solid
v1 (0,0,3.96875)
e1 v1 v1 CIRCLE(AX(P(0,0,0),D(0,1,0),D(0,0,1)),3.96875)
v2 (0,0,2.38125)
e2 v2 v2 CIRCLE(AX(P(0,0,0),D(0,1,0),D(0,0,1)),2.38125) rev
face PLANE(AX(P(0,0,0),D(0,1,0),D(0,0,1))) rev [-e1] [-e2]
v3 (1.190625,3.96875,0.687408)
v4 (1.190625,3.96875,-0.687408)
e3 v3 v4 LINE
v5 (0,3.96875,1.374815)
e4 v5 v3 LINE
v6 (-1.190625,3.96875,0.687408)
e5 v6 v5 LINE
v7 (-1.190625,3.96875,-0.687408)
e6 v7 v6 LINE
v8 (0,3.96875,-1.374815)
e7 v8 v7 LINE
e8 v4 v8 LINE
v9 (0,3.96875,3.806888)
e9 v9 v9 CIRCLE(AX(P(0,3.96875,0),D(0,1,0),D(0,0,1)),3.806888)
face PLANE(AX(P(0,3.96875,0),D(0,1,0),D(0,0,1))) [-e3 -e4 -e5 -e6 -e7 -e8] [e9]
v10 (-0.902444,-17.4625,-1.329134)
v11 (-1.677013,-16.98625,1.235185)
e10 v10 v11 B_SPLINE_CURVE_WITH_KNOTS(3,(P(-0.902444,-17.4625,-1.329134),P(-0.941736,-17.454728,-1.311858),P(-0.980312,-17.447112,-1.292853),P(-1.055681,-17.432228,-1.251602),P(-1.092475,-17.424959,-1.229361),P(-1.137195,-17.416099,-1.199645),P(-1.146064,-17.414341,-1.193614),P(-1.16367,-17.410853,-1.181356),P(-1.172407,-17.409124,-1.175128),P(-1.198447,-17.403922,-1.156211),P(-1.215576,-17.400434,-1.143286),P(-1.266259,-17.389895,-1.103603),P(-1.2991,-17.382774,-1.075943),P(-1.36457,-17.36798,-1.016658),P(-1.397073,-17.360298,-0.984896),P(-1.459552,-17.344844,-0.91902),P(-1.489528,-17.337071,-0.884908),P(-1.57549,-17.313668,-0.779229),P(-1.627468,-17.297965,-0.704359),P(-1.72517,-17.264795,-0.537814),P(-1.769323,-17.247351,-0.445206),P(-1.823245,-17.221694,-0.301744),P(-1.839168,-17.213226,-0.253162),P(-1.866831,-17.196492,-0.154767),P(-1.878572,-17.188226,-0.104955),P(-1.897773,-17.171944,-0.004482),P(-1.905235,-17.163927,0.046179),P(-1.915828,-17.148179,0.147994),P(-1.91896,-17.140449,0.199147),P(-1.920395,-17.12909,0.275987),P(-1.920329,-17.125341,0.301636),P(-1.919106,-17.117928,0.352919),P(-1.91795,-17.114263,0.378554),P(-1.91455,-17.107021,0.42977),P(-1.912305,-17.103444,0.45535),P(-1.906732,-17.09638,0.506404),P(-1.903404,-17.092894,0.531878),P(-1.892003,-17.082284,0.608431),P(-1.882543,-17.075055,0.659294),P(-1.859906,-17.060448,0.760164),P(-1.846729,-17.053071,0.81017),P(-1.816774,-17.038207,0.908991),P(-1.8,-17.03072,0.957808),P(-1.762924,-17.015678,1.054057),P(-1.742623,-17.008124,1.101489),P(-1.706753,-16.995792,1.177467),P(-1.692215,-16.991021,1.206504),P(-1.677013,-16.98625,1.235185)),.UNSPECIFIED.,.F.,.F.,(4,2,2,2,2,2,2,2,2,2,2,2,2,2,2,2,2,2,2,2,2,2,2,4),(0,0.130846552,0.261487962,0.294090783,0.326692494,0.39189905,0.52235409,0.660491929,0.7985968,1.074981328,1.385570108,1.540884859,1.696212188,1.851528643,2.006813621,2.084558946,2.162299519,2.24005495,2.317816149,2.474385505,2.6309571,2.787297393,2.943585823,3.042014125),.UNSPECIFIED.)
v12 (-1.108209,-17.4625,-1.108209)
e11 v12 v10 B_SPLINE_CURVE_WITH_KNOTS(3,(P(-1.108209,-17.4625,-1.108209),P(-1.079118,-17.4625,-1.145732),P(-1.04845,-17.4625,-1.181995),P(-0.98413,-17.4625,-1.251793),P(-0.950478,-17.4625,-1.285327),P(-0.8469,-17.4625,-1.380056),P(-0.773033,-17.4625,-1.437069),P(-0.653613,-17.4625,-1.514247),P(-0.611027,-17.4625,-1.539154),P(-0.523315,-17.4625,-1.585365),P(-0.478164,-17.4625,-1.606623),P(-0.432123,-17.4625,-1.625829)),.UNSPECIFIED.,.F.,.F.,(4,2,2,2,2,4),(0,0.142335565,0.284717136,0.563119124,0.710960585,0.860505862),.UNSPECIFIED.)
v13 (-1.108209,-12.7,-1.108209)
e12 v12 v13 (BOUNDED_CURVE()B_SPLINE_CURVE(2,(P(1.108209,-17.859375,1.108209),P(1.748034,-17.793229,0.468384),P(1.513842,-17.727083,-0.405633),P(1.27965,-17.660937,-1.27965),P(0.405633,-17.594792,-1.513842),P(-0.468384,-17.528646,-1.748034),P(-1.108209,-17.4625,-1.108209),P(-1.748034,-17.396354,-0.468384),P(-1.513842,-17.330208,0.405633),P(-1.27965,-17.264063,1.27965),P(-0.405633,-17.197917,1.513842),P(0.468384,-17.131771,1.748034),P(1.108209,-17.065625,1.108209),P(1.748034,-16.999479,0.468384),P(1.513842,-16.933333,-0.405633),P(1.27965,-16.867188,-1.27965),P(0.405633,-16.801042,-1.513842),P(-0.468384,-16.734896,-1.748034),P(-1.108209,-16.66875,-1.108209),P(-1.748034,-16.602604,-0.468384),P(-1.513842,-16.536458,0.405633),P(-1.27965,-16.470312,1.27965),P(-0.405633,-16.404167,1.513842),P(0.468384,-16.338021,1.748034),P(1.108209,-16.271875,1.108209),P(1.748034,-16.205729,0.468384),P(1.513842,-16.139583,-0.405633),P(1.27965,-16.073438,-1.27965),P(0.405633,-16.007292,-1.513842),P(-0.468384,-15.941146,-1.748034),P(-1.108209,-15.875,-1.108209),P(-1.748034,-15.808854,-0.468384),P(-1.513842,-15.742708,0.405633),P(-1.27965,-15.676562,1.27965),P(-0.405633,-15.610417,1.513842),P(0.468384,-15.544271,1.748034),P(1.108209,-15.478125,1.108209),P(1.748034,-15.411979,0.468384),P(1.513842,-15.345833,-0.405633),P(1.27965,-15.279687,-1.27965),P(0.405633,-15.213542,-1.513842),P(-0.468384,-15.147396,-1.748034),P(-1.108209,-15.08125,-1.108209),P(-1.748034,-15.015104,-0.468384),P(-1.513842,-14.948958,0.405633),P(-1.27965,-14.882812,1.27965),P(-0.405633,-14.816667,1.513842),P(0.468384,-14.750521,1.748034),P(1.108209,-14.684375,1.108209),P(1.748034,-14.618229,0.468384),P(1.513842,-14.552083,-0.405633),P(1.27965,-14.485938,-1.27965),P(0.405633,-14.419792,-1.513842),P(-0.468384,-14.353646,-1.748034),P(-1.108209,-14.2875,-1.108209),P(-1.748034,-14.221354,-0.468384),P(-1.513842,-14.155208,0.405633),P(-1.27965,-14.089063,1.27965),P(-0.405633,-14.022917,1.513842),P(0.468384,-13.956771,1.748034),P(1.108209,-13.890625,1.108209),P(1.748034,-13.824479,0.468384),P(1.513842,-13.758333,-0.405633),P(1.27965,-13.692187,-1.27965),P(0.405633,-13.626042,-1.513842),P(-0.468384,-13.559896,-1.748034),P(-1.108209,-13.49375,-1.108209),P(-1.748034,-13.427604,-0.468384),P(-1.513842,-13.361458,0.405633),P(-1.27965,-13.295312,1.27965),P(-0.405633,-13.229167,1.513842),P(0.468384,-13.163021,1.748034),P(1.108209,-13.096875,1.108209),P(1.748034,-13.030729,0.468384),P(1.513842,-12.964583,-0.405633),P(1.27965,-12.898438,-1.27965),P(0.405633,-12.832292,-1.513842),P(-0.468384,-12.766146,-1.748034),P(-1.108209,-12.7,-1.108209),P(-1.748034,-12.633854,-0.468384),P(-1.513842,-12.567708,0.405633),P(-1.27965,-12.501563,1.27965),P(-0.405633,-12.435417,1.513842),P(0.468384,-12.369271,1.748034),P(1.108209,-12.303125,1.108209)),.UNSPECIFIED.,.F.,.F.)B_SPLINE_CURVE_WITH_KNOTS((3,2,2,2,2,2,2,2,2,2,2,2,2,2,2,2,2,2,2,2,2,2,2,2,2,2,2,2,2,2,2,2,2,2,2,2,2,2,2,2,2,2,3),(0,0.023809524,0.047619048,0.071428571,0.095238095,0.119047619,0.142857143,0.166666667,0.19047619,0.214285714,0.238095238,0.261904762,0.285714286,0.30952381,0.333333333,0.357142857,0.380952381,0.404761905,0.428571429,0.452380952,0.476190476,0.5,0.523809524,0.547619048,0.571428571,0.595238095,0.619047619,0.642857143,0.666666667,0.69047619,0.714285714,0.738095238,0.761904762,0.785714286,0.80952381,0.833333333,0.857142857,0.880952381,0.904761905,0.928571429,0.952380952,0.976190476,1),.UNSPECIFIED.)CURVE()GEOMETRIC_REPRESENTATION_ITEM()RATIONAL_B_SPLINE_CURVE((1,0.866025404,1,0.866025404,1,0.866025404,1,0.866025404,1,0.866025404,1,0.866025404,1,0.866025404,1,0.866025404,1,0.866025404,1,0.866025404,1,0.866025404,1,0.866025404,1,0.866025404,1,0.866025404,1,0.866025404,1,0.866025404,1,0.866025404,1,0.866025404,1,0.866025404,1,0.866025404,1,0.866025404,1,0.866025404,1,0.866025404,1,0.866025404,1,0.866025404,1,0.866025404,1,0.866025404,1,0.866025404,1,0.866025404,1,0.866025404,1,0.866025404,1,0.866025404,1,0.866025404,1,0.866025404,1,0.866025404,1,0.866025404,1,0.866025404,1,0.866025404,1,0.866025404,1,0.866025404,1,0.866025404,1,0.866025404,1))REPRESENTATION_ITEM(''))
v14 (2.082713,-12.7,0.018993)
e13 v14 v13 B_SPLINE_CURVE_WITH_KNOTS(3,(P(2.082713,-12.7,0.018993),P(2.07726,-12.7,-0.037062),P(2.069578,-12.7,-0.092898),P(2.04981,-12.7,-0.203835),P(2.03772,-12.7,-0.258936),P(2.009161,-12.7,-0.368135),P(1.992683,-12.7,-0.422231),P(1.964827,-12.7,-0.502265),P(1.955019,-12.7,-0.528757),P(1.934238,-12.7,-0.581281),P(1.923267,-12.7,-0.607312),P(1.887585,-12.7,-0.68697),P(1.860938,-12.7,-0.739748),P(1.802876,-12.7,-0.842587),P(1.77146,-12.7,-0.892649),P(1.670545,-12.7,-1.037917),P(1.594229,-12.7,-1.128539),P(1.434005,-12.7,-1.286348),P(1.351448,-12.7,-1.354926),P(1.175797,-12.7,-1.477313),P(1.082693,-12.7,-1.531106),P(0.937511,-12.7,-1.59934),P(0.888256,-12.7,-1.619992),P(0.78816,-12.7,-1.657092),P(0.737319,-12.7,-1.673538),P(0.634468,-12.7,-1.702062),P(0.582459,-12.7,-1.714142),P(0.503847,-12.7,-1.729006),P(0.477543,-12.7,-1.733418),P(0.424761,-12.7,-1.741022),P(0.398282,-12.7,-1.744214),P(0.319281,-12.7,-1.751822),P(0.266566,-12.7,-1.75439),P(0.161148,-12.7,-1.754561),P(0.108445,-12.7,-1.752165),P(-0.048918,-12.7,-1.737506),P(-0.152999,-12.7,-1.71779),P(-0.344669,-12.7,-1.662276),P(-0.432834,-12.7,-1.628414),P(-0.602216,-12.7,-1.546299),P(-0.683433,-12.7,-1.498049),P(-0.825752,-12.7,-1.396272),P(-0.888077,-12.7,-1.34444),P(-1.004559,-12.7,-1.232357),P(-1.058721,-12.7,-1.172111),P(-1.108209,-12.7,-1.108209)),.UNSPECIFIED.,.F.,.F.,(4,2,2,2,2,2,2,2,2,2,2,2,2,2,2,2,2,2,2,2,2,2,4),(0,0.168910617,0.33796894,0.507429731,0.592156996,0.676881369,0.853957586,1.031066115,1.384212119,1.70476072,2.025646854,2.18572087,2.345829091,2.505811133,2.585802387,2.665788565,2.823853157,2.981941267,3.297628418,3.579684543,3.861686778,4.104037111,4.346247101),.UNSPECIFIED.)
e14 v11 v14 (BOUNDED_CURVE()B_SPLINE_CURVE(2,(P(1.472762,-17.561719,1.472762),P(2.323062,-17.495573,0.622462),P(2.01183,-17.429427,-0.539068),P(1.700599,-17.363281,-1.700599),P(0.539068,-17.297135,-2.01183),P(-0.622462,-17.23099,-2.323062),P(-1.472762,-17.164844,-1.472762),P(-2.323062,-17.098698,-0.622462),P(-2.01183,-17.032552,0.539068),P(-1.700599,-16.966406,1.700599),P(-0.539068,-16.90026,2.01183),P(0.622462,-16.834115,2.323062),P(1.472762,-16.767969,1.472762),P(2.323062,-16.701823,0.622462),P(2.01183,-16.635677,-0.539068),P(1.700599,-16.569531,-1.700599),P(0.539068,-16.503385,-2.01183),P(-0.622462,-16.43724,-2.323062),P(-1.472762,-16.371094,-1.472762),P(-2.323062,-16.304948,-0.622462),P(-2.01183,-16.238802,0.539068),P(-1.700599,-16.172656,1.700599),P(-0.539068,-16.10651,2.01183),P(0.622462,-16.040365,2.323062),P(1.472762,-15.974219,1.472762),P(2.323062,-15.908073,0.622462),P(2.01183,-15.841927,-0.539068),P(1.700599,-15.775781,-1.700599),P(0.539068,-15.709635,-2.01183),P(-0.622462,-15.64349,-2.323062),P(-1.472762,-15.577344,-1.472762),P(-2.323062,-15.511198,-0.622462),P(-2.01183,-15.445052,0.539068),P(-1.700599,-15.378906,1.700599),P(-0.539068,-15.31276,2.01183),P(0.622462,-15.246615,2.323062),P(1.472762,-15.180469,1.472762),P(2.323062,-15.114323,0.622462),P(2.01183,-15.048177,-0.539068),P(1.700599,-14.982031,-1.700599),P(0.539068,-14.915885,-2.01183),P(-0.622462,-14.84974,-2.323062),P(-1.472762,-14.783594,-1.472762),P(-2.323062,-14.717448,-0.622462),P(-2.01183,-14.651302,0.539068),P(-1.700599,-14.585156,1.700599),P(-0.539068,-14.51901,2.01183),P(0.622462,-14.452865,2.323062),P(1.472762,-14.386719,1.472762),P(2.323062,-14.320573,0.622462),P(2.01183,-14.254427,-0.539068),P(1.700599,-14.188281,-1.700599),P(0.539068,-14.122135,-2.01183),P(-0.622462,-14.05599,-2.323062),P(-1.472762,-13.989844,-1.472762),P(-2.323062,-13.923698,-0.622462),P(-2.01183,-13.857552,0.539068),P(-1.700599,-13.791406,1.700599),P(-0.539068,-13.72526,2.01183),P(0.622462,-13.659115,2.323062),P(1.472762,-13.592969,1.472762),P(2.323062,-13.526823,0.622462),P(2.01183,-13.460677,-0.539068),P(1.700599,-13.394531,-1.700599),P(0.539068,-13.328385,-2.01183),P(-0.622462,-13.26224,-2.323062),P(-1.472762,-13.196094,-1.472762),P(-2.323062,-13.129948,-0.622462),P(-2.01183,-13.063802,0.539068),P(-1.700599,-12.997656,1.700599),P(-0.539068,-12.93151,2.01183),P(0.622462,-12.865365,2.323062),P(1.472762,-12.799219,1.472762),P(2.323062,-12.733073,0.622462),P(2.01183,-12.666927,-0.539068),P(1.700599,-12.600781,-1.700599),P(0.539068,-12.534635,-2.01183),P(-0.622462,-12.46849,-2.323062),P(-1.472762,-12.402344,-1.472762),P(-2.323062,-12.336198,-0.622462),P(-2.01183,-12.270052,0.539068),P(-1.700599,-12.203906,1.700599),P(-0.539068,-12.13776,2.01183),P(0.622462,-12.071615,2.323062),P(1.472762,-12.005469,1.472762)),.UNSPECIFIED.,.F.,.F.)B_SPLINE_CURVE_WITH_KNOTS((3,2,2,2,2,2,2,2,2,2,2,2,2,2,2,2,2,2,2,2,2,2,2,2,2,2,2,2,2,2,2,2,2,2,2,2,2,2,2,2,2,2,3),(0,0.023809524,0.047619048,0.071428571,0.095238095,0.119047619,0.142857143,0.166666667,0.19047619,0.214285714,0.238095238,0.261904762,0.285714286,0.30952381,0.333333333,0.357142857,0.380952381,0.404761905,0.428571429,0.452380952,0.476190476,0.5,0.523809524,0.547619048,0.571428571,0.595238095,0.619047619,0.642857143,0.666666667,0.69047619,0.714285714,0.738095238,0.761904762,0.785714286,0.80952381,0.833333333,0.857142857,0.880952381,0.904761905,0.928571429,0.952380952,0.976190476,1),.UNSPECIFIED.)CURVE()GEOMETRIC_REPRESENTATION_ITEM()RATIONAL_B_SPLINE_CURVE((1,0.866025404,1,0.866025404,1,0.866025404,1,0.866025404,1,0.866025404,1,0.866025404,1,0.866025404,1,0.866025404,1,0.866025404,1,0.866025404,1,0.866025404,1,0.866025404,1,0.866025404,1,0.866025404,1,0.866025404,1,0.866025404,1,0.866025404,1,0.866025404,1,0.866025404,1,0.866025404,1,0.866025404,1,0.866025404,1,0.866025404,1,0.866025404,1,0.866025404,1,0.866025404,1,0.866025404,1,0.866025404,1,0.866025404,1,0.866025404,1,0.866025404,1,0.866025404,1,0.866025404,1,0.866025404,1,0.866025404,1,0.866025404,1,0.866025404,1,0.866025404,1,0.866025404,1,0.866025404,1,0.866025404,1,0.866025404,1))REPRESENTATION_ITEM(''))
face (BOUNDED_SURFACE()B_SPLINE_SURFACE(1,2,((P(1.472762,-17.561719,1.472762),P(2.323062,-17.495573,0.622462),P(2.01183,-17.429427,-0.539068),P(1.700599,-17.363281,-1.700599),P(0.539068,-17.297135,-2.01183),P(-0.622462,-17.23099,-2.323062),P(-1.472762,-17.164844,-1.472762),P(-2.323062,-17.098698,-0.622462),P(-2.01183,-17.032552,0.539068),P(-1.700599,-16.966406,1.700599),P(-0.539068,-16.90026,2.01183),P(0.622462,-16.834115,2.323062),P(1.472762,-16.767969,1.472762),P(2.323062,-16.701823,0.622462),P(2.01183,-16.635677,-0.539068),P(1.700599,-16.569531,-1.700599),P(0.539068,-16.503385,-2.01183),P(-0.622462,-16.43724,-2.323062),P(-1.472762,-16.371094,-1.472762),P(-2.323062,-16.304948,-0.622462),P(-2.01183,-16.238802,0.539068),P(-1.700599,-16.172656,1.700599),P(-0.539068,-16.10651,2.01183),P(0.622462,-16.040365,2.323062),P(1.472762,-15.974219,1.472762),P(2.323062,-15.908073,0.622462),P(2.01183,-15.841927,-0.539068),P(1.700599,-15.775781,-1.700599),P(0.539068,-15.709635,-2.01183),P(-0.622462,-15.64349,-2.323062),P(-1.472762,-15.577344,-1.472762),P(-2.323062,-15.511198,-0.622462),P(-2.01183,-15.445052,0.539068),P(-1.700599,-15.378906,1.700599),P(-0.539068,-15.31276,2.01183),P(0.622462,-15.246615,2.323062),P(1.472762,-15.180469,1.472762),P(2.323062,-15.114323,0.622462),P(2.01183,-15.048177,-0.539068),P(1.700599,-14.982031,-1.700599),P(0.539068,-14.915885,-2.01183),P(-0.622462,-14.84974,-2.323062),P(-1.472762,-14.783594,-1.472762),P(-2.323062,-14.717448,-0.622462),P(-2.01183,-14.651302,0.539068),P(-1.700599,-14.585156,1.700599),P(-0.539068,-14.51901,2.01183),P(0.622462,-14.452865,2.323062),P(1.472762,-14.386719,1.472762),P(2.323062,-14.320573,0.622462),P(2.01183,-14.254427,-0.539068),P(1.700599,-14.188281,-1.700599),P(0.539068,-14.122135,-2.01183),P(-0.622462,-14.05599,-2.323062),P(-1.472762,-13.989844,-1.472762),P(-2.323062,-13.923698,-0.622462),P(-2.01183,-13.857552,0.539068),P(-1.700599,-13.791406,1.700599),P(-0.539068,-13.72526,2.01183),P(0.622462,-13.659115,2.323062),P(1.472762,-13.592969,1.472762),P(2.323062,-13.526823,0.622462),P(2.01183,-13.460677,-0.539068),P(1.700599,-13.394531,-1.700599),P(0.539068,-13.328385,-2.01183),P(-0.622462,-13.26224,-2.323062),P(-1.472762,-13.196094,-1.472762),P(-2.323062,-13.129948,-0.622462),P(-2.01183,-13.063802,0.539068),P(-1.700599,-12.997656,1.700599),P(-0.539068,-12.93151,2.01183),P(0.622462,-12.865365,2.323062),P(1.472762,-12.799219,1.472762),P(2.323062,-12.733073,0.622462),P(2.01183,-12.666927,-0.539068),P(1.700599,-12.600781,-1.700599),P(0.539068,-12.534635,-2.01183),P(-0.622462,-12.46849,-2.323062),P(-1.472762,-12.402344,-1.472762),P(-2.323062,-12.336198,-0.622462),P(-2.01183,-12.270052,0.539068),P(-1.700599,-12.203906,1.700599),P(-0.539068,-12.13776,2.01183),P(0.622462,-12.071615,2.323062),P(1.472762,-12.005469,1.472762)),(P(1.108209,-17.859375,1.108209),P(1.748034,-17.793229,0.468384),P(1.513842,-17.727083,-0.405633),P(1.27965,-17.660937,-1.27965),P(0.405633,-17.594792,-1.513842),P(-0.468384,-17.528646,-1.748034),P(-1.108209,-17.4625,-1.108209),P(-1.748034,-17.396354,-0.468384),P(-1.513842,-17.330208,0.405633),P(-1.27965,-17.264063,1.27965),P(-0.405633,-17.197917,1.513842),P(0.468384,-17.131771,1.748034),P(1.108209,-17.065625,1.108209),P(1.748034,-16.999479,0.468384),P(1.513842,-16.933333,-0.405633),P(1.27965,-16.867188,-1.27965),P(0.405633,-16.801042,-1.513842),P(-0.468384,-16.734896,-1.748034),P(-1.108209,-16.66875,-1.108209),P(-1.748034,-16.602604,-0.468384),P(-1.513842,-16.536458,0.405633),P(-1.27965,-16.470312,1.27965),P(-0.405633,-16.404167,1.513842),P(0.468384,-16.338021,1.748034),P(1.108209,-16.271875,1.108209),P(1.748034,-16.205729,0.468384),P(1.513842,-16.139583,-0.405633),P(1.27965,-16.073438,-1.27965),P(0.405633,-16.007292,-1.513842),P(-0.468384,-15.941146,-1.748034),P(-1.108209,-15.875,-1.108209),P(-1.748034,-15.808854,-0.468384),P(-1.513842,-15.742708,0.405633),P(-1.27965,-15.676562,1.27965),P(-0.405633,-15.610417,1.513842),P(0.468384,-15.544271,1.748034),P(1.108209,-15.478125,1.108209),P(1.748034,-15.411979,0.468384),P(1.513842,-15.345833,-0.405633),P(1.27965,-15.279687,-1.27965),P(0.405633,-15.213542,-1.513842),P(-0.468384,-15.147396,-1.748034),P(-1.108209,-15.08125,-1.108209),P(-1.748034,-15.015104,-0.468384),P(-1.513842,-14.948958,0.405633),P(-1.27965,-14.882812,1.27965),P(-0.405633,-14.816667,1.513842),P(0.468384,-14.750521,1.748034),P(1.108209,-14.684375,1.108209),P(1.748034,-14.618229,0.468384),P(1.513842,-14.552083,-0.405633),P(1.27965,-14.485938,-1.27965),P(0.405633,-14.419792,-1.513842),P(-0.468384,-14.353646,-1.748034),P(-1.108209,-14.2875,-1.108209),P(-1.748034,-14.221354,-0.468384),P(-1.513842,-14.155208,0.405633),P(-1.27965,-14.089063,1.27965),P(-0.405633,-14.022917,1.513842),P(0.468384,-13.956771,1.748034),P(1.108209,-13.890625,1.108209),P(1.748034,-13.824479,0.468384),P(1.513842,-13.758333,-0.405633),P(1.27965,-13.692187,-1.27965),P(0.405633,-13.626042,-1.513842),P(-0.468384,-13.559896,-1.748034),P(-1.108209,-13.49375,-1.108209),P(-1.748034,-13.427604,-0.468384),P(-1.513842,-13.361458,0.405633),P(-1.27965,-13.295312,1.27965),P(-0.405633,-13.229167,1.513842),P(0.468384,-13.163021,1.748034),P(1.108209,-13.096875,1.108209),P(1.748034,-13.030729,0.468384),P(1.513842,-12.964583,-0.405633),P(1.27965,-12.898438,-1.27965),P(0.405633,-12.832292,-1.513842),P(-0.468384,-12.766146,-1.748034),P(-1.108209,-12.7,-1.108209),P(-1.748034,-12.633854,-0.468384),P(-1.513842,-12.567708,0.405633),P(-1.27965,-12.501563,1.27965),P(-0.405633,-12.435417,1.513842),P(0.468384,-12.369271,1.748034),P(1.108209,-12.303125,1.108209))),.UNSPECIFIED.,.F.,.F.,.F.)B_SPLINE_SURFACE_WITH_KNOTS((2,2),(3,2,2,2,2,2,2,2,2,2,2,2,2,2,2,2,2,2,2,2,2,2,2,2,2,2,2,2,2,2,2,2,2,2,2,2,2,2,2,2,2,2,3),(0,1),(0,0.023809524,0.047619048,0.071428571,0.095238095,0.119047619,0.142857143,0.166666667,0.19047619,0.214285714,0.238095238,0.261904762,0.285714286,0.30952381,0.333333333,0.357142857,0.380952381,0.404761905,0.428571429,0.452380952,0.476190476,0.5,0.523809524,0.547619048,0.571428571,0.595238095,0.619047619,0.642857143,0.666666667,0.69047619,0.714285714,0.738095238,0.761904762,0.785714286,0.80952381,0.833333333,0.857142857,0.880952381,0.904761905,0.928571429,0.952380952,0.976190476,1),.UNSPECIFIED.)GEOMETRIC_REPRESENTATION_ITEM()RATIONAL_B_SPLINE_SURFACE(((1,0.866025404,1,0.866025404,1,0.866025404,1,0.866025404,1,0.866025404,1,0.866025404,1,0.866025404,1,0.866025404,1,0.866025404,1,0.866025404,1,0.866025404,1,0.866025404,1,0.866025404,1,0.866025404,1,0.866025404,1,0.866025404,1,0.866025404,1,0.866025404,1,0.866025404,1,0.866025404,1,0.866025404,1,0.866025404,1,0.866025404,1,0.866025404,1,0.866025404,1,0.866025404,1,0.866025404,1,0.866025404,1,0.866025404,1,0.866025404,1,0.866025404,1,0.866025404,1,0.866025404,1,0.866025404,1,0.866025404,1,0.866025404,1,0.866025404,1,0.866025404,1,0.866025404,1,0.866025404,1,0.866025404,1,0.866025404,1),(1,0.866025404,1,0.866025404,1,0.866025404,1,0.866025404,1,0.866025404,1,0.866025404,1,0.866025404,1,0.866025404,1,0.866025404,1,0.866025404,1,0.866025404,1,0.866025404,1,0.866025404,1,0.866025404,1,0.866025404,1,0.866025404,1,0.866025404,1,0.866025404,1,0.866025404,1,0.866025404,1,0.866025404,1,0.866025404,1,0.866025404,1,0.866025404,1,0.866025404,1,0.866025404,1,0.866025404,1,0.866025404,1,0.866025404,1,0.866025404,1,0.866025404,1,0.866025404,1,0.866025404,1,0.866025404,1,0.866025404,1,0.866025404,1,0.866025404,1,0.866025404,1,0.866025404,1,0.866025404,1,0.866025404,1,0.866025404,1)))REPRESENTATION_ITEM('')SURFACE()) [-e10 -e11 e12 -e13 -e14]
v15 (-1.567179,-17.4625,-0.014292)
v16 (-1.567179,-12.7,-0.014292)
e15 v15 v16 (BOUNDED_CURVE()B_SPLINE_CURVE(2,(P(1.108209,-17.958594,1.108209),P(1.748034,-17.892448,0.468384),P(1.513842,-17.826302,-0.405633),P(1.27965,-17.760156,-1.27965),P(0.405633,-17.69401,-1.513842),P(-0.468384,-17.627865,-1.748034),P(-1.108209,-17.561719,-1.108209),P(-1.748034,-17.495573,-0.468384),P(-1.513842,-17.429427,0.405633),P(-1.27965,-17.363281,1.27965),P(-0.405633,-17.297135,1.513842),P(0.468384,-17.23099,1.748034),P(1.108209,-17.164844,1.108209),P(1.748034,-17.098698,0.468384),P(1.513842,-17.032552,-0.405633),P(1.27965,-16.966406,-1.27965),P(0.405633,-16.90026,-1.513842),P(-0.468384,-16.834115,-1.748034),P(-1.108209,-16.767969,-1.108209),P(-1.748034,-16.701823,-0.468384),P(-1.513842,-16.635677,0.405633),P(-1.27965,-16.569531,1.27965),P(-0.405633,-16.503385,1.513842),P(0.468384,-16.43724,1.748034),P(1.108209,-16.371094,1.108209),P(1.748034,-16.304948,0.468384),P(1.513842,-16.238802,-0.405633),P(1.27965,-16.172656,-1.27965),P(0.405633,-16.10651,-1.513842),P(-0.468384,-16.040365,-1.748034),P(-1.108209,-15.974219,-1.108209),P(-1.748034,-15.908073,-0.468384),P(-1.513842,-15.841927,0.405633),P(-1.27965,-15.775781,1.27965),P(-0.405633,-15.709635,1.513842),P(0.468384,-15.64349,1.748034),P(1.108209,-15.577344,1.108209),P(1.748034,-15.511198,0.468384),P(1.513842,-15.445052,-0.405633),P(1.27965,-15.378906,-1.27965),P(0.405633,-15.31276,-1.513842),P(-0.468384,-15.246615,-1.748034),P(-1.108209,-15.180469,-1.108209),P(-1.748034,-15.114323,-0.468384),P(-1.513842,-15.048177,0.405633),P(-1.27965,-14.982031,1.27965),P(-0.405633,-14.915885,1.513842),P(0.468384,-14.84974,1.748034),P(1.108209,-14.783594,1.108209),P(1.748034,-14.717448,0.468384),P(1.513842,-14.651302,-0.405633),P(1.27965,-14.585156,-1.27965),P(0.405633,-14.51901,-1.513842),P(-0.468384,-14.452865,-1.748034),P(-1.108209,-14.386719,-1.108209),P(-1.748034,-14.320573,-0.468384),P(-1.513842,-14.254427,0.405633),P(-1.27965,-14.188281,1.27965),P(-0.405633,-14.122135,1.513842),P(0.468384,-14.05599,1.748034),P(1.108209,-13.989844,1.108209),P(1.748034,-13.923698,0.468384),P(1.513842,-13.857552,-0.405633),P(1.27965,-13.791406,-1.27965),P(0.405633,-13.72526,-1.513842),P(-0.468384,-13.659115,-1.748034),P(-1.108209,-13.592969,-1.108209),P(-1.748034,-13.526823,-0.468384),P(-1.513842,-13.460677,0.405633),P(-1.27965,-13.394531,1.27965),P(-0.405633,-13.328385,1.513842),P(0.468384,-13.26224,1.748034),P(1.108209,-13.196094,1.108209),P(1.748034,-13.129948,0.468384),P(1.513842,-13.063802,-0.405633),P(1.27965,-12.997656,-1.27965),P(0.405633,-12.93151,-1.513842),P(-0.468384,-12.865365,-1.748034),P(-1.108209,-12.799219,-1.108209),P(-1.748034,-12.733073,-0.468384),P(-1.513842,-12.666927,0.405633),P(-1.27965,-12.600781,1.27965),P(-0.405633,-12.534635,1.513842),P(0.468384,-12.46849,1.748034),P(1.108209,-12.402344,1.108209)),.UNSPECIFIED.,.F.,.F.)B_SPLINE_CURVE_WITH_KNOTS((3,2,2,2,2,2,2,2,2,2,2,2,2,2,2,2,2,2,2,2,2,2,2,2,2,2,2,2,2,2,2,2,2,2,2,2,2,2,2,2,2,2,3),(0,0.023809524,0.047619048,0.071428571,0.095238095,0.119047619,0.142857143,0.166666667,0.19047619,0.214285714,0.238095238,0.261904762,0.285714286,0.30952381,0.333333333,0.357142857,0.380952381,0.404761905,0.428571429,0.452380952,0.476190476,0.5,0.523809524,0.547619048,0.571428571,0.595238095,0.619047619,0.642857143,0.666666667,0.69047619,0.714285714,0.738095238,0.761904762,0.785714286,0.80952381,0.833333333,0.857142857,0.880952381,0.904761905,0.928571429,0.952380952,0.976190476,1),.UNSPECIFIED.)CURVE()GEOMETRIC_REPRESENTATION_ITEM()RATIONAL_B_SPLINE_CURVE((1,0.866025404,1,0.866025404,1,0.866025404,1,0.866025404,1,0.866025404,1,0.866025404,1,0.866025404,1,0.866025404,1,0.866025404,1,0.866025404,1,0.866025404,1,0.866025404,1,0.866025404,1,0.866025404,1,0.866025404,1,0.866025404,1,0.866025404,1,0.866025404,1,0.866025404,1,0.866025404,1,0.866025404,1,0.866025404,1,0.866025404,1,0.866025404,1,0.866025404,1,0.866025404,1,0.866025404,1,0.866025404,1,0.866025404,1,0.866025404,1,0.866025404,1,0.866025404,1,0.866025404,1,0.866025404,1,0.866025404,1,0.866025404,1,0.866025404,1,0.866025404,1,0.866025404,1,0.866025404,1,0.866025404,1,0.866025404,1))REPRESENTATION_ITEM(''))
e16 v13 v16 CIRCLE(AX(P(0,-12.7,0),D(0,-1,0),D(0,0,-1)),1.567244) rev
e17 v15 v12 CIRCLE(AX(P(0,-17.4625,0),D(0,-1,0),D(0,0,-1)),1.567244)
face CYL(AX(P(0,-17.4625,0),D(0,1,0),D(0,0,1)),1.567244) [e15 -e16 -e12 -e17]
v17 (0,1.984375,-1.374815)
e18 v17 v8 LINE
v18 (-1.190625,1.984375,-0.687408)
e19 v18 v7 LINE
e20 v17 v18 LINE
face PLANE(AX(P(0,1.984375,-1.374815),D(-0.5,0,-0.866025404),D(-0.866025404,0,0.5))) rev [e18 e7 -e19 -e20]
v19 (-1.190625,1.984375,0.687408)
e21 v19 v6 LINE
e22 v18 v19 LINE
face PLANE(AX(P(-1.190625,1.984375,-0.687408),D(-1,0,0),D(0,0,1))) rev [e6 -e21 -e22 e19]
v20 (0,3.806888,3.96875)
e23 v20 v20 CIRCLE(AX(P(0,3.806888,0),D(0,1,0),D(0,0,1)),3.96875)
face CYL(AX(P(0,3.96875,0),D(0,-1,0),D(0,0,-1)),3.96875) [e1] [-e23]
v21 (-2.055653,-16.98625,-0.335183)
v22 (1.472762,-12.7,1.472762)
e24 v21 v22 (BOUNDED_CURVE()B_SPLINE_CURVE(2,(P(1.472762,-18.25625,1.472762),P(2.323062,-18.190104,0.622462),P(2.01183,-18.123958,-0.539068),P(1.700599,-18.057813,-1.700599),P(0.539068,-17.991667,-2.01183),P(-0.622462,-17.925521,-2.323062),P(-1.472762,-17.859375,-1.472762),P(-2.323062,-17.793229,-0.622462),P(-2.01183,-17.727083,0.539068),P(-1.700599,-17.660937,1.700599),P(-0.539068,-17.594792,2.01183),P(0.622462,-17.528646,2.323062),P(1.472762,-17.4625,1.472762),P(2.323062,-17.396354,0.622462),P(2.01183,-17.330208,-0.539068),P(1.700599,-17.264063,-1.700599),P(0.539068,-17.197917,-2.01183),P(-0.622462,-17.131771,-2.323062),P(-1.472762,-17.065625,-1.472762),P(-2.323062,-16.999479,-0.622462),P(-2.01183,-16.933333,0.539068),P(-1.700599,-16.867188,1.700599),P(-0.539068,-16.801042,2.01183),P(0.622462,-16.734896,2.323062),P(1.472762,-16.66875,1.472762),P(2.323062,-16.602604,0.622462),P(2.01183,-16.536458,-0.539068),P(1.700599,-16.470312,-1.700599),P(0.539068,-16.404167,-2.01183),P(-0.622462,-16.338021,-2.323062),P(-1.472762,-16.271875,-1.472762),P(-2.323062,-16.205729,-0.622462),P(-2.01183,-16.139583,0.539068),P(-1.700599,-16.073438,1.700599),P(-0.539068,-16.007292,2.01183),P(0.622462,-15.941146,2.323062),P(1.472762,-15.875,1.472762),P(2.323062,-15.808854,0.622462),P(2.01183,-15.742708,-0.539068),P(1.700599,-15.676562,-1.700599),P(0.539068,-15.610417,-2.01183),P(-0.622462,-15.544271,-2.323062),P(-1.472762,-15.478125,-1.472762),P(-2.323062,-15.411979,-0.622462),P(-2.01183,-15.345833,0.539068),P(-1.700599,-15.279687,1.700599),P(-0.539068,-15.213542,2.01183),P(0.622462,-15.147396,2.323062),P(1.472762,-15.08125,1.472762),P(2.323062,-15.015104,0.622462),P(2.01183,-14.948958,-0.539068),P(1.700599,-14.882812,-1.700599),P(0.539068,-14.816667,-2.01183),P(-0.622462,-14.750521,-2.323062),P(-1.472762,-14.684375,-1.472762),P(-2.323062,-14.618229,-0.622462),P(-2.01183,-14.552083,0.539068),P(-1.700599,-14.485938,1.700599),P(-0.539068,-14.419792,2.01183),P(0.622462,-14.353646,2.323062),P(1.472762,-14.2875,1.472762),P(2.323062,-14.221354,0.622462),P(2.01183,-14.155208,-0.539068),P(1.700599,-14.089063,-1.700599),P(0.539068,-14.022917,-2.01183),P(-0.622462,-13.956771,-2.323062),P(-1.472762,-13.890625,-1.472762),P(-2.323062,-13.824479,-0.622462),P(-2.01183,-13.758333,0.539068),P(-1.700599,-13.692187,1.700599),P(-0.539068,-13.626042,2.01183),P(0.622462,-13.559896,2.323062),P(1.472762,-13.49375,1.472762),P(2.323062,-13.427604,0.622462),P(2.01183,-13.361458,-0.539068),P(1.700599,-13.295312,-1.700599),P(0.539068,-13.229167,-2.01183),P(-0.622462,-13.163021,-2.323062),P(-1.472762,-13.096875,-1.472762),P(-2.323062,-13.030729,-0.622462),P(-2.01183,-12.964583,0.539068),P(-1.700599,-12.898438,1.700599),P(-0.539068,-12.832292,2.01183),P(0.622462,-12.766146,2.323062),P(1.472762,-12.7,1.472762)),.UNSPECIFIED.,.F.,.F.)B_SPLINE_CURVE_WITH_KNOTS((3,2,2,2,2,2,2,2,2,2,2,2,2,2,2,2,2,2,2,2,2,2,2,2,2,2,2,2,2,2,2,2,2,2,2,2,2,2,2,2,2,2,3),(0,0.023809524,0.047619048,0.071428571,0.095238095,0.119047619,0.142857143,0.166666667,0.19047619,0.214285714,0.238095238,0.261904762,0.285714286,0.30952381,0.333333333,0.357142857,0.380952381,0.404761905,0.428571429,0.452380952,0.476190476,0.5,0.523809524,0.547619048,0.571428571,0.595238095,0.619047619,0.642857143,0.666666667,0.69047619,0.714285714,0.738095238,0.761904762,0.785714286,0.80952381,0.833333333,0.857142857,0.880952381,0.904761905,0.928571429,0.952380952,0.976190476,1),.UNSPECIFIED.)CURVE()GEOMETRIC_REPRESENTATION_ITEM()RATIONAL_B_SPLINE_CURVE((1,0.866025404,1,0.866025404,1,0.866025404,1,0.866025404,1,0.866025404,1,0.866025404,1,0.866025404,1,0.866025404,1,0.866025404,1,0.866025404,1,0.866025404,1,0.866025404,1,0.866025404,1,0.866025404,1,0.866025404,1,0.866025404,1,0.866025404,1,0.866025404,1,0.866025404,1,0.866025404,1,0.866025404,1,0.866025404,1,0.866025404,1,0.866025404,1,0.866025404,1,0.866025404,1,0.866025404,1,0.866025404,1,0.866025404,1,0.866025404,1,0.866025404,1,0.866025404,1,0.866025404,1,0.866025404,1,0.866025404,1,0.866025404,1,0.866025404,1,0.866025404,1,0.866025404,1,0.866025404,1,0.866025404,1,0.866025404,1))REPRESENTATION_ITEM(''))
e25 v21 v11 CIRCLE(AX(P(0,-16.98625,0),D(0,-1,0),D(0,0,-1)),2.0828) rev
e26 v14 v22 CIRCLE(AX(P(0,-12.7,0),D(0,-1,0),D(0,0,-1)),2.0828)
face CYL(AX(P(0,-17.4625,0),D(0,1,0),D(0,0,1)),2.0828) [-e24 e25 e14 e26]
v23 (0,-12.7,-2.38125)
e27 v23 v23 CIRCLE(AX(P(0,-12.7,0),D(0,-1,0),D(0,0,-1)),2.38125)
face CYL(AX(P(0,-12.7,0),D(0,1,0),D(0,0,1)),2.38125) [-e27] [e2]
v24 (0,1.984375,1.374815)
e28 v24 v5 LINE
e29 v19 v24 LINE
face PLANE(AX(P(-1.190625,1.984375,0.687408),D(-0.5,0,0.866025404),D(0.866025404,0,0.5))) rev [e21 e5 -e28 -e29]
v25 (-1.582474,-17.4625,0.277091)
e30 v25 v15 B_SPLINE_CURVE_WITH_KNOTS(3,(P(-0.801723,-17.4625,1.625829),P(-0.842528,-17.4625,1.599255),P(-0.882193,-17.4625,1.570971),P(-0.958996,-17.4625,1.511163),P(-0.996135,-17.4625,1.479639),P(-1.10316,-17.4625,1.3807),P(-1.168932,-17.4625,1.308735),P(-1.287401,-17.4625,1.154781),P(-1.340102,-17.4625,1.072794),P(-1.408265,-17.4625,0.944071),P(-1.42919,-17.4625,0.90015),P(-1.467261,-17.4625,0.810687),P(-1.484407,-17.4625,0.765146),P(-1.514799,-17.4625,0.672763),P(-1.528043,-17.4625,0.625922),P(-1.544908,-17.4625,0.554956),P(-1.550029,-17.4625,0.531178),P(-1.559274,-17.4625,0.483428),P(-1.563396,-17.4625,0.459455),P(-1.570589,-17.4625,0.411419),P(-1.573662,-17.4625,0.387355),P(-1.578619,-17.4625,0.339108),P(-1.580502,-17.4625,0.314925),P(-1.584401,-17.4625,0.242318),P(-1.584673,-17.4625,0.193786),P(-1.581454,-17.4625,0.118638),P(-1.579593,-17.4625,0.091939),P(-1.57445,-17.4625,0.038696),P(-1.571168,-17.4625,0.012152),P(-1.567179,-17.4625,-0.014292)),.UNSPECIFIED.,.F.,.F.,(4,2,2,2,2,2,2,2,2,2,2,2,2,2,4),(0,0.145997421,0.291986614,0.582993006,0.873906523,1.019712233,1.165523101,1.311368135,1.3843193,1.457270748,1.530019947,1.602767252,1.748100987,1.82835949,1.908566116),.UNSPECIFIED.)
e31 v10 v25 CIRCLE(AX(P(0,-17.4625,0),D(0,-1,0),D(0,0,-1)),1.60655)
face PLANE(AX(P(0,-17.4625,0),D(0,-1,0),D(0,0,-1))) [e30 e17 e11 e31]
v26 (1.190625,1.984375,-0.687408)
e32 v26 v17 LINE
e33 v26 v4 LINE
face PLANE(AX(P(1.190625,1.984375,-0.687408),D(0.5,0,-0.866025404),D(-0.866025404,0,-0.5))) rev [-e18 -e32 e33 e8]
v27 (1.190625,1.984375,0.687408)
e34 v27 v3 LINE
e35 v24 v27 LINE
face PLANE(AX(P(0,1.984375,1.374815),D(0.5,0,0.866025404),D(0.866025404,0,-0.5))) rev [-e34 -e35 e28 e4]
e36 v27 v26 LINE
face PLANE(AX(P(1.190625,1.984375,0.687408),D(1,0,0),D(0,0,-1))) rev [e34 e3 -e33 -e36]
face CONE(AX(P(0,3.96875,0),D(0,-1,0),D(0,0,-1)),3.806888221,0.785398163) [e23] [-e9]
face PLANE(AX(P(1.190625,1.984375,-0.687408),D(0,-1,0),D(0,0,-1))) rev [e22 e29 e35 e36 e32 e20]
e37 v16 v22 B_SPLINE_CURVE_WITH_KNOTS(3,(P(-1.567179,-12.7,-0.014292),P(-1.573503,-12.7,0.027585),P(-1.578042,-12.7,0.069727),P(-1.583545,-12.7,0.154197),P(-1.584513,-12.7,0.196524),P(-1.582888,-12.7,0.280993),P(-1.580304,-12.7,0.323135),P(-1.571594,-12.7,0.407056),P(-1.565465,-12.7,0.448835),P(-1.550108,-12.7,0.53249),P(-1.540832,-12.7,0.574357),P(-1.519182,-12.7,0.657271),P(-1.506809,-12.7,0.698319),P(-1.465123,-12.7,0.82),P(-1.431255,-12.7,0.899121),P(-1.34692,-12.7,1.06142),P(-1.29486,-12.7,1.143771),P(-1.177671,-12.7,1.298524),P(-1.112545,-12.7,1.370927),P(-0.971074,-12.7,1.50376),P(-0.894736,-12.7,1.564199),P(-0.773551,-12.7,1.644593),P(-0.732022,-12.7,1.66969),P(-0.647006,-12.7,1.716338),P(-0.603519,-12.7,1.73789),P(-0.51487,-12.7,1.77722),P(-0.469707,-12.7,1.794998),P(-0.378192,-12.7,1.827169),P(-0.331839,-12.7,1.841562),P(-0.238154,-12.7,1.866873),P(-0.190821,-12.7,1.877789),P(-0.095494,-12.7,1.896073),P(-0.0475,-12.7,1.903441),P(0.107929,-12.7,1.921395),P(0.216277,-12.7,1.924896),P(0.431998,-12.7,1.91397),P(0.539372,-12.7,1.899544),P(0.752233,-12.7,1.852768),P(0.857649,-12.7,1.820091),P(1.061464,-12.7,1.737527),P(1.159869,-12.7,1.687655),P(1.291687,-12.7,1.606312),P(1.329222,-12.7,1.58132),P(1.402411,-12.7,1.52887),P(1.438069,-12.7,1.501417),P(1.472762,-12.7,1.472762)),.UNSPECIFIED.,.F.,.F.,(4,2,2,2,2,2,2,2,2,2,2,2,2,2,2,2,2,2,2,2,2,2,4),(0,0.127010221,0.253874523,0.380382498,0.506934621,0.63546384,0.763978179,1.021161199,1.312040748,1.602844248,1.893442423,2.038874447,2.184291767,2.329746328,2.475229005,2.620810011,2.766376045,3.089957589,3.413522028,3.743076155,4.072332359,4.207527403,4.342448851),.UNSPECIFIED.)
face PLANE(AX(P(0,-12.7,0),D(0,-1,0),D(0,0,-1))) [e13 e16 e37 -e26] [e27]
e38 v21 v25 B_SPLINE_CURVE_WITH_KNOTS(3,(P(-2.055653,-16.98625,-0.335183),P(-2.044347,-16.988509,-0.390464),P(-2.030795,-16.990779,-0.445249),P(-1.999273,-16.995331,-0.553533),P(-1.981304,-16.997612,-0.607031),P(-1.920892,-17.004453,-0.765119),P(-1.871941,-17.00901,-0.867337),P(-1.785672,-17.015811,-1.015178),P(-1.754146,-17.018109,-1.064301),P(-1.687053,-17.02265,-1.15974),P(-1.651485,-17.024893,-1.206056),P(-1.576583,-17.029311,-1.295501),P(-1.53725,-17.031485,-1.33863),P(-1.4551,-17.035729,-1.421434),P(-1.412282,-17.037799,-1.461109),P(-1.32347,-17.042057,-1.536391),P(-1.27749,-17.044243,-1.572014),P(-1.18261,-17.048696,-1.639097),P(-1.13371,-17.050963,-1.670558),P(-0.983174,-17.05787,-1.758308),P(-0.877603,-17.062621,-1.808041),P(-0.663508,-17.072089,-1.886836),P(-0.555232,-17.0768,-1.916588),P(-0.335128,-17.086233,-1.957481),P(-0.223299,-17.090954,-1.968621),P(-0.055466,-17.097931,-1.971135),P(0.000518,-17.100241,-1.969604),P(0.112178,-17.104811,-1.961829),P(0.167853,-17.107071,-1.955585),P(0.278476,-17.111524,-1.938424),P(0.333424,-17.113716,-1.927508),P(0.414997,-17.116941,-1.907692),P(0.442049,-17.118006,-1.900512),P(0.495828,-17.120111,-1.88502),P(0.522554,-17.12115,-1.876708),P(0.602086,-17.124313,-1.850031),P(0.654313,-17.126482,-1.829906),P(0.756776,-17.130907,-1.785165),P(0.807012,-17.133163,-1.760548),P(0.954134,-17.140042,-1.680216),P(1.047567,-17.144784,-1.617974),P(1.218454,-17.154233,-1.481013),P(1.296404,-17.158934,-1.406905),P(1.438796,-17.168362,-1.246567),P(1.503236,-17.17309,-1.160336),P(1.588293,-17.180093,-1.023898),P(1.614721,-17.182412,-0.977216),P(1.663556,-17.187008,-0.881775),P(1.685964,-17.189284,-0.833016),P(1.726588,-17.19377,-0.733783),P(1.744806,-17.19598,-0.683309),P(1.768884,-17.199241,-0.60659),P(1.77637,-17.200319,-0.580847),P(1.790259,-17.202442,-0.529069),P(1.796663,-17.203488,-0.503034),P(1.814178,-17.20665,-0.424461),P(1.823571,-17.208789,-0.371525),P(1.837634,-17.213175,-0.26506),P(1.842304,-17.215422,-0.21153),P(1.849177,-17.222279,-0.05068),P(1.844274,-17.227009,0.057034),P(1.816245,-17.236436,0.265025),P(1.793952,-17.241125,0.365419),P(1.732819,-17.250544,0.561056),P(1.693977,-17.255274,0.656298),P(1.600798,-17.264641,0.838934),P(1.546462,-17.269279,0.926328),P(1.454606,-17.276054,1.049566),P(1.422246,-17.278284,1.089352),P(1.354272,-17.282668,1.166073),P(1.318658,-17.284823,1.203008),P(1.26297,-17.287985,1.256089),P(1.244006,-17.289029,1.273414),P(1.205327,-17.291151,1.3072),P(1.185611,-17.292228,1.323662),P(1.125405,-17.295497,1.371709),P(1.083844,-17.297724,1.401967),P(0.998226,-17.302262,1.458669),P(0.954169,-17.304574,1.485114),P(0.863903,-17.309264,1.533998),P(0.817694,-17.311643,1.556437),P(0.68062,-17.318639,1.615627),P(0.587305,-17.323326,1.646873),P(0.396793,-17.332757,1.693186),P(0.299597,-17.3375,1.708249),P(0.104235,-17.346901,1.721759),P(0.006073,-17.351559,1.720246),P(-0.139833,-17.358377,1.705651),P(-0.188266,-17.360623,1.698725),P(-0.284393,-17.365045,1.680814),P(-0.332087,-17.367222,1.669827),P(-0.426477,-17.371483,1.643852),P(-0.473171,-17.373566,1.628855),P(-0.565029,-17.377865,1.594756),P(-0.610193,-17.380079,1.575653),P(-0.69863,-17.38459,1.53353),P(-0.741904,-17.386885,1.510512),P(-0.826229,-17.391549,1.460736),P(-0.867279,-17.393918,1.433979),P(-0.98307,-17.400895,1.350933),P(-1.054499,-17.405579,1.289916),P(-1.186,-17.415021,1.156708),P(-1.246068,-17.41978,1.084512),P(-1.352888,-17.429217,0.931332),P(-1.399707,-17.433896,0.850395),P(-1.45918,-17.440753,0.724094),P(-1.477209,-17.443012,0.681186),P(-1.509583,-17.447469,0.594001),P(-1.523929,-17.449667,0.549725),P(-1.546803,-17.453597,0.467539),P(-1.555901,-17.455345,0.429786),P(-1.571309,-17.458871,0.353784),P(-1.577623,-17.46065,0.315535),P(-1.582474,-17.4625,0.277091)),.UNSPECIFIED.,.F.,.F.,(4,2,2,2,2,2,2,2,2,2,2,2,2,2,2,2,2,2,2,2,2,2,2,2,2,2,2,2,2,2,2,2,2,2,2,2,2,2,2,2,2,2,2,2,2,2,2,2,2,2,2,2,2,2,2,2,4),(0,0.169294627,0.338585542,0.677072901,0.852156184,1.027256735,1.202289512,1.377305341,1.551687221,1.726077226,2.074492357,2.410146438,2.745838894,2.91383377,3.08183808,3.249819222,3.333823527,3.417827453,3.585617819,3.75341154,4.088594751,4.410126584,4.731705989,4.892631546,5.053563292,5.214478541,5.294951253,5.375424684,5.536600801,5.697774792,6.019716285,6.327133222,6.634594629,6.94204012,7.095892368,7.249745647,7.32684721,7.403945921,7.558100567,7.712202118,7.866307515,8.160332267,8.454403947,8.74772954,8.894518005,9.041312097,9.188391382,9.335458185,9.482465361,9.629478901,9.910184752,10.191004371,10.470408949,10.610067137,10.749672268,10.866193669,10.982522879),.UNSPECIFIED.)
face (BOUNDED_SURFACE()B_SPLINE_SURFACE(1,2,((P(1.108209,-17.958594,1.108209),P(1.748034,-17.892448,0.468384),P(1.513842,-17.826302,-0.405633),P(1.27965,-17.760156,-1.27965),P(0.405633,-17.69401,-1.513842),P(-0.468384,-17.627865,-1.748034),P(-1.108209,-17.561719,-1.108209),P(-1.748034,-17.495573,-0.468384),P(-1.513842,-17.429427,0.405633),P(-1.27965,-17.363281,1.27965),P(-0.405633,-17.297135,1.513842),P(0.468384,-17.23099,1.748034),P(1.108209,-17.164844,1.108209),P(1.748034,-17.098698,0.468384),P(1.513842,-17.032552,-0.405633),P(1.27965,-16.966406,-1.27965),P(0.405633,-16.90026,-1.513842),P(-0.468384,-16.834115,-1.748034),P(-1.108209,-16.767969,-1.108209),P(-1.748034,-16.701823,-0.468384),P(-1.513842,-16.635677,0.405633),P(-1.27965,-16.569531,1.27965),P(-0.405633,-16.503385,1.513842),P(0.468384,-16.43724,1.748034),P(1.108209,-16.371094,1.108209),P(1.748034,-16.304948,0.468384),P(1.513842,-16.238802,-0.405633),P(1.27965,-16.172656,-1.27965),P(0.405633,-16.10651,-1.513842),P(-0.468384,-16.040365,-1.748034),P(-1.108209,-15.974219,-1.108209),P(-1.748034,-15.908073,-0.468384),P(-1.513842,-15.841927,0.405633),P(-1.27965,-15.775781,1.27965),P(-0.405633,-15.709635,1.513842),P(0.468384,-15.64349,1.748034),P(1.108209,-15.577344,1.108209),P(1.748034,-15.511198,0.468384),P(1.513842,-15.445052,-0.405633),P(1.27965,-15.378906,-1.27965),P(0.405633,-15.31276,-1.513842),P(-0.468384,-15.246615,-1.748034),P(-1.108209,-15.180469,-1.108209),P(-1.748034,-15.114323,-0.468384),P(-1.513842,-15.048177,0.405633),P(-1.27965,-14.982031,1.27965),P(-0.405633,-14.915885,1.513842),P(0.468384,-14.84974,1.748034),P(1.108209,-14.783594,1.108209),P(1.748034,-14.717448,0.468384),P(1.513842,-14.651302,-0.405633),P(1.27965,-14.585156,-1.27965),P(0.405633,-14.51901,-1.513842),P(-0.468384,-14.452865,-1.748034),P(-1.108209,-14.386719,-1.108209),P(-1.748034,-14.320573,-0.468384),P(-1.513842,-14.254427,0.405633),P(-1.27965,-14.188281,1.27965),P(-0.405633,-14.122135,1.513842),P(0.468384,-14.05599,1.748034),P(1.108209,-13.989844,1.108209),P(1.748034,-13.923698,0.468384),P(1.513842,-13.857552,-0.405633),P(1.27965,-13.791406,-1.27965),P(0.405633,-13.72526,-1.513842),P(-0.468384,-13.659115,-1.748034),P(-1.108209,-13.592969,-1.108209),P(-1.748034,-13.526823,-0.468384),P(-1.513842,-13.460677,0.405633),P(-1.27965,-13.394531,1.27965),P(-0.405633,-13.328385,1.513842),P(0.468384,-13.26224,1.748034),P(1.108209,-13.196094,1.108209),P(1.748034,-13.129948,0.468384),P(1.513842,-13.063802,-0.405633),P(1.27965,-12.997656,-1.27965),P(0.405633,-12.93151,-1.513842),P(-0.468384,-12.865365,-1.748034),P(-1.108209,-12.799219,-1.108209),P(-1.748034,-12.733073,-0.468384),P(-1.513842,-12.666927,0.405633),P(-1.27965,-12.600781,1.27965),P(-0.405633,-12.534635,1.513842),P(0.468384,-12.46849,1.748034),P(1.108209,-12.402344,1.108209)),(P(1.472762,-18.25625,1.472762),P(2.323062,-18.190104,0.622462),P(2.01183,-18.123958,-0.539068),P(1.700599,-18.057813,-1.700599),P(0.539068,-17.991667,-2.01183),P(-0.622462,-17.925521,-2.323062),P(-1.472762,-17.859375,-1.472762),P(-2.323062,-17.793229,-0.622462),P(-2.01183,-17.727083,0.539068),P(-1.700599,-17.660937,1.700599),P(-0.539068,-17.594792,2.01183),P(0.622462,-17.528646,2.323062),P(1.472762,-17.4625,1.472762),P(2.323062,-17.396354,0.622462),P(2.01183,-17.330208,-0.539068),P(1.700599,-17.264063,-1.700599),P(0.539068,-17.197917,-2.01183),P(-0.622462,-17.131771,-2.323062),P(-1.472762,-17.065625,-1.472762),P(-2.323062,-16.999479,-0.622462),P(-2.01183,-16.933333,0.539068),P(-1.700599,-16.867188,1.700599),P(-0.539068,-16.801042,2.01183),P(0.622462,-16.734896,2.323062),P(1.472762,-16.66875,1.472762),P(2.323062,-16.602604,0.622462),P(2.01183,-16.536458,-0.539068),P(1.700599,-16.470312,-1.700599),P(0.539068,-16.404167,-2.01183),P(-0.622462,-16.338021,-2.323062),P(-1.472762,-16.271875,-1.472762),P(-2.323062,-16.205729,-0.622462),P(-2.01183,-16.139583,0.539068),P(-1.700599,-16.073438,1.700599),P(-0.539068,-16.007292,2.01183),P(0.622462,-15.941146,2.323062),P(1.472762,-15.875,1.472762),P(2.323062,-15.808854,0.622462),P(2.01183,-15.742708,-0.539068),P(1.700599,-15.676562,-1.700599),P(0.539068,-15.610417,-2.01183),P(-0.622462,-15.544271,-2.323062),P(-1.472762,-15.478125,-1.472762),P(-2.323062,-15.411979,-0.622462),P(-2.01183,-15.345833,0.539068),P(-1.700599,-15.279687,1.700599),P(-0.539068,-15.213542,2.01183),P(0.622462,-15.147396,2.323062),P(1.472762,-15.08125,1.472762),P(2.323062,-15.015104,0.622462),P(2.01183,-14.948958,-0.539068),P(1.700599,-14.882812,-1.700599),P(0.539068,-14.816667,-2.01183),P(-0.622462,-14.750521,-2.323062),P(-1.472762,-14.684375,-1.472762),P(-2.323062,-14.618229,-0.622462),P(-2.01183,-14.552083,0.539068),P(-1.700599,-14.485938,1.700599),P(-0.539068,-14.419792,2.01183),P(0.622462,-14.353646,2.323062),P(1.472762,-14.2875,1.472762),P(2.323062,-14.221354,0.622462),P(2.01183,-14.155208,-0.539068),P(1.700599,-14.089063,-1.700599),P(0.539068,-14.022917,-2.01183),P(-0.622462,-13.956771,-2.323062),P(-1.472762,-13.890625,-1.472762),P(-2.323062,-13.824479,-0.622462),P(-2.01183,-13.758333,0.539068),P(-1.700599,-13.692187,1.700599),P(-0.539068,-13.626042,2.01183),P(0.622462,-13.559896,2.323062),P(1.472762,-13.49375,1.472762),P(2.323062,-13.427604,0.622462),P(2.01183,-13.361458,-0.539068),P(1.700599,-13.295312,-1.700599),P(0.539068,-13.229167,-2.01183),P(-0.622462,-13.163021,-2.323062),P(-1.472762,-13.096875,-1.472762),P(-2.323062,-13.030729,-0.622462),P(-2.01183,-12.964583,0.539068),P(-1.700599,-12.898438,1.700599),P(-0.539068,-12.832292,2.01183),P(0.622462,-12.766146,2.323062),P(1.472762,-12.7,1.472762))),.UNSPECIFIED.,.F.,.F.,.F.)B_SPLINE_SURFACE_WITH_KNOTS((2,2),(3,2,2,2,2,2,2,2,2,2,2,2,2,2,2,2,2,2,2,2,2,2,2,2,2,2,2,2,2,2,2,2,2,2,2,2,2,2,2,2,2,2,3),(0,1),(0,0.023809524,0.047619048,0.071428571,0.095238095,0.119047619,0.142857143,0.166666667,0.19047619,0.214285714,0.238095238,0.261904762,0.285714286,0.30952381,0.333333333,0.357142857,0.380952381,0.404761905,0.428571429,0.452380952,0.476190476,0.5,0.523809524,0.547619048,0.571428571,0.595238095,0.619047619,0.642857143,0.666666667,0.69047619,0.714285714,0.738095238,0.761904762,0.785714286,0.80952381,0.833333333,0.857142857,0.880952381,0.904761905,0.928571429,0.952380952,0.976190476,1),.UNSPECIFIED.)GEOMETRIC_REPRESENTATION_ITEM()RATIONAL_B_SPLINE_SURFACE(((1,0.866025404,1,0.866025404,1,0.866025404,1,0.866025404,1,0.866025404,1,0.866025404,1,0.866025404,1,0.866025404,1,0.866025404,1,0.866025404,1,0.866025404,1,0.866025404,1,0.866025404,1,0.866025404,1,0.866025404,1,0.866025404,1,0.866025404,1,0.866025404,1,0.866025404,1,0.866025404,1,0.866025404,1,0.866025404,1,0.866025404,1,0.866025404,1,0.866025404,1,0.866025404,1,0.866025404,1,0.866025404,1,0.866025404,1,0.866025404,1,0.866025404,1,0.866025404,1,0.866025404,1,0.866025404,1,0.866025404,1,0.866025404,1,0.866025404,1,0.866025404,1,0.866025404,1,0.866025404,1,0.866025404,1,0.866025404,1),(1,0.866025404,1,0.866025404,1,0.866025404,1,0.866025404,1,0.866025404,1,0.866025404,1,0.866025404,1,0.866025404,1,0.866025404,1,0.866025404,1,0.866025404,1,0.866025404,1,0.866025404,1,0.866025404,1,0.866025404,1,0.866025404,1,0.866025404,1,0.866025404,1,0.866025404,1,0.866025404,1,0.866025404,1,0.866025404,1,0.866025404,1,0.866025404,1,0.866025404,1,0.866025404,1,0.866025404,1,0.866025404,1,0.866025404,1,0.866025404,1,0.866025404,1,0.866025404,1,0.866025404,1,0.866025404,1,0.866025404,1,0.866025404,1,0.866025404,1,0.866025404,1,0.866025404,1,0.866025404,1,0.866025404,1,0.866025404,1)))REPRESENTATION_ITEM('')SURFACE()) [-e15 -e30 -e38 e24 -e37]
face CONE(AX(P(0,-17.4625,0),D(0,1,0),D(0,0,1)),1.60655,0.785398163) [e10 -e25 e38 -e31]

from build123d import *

# Parameters (mm, degrees)
SKETCH1_R          = 3.96875
EXTRUDE1_DEPTH     = 3.96875
CUT_EXTRUDE1_DEPTH = 1.984375
SKETCH4_R          = 2.38125
EXTRUDE2_DEPTH     = 12.7
SKETCH5_R          = 2.0828
EXTRUDE3_DEPTH     = 4.7625
CHAMFER1_SIZE      = 0.47625
CUT_SWEEP1_PITCH   = 0.79375
CUT_SWEEP1_TO      = 4.7625


with BuildPart() as part:
    # Sketch1 → Extrude1 (new body)
    with BuildSketch(Plane(origin=(0, 0, 0), x_dir=(1, 0, 0), z_dir=(0, 1, 0))):
        with Locations(Location((0, 0, 0), (0, 0, 270))):
            Circle(SKETCH1_R)
    extrude(amount=EXTRUDE1_DEPTH)

    # Sketch2 → Cut-Extrude1 (cut)
    with BuildSketch(Plane(origin=(0, 3.96875, 0), x_dir=(-1, 0, 0), z_dir=(0, 1, 0))):
        Polygon((0, -1.374815329), (1.190625, -0.687407664), (1.190625, 0.687407664), (0, 1.374815329), (-1.190625, 0.687407664), (-1.190625, -0.687407664), align=None)
    extrude(amount=-CUT_EXTRUDE1_DEPTH, mode=Mode.SUBTRACT)

    # Sketch4 → Extrude2 (add)
    with BuildSketch(Plane.XZ):
        with Locations(Location((0, 0, 0), (0, 0, 90))):
            Circle(SKETCH4_R)
    extrude(amount=EXTRUDE2_DEPTH)

    # Sketch5 → Extrude3 (add)
    with BuildSketch(Plane.XZ.offset(12.7)):
        with Locations(Location((0, 0, 0), (0, 0, 90))):
            Circle(SKETCH5_R)
    extrude(amount=EXTRUDE3_DEPTH)

    # Chamfer1
    chamfer1_edges = [part.edges().sort_by_distance(p)[0] for p in [
        (0, -17.4625, -2.0828),
    ]]
    chamfer(chamfer1_edges, length=CHAMFER1_SIZE)

    # Cut-Sweep1: arcs per turn and ends read off the stored shape
    # Cut-Sweep1: the profile of Sketch13 profile screwed along a right-hand helix through 7 turns, 6 arcs to a turn; built about Z, then put on its axis
    cut_sweep1_z = Axis((0, 0, 0), (0, 0, 1))
    cut_sweep1_corners = [(2.0831, 0, -0.099045545), (2.0831, 0, -0.793923205), (1.567244252, 0, -0.49609375), (1.567244252, 0, -0.396875)]
    with BuildLine(mode=Mode.PRIVATE) as cut_sweep1_profile:
        Line(cut_sweep1_corners[0], cut_sweep1_corners[1])
        Line(cut_sweep1_corners[1], cut_sweep1_corners[2])
        Line(cut_sweep1_corners[2], cut_sweep1_corners[3])
        Line(cut_sweep1_corners[3], cut_sweep1_corners[0])
    cut_sweep1_cap = Face(cut_sweep1_profile.wire())
    cut_sweep1_turn_angles = [0, 30, 60, 90, 120, 150, 180, 210, 240, 270, 300, 330, 360]
    cut_sweep1_turn_weights = [1, 0.8660254037844387, 1, 0.8660254037844387, 1, 0.8660254037844387, 1, 0.8660254037844387, 1, 0.8660254037844387, 1, 0.8660254037844387, 1]
    cut_sweep1_turn_rails = [Edge.make_bspline([Vector(p[0], p[1], 0).rotate(cut_sweep1_z, cut_sweep1_turn_angles[k]) / cut_sweep1_turn_weights[k] + Vector(0, 0, p[2] + CUT_SWEEP1_PITCH * cut_sweep1_turn_angles[k] / 360) for k in range(13)], [0, 0, 0, 1, 1, 2, 2, 3, 3, 4, 4, 5, 5, 6, 6, 6], 2, cut_sweep1_turn_weights) for p in cut_sweep1_corners]
    cut_sweep1_turn_sides = [Face.make_surface_from_curves(cut_sweep1_turn_rails[p[0]], cut_sweep1_turn_rails[p[1]]) for p in [(0, 1), (1, 2), (2, 3), (3, 0)]]
    cut_sweep1 = Plane(origin=(0, -17.4625, 0), x_dir=(0.7071067811865438, 0, 0.7071067811865512), z_dir=(0, 1, 0)) * split(Solid(Shell([*[p.moved(Location((0, 0, CUT_SWEEP1_PITCH * i))) for i in range(7) for p in cut_sweep1_turn_sides], cut_sweep1_cap, cut_sweep1_cap.rotate(cut_sweep1_z, 2520).moved(Location((0, 0, CUT_SWEEP1_PITCH * 2520 / 360)))])), bisect_by=Plane.XY.offset(CUT_SWEEP1_TO), keep=Keep.BOTTOM, mode=Mode.PRIVATE)
    add(cut_sweep1, mode=Mode.SUBTRACT)

    # Sketch11 → Cut-Revolve7 (revolve, cut)
    with BuildSketch(Plane.XY, mode=Mode.PRIVATE) as cut_revolve7_sk:
        Polygon((3.96875, 3.806888221), (3.806888221, 3.96875), (3.96875, 3.96875), align=None)
    revolve(cut_revolve7_sk.sketch.rotate(Axis((0, 14.544175091, 0), (0, -1, 0)), 90), axis=Axis((0, 14.544175091, 0), (0, -1, 0)), mode=Mode.SUBTRACT)


solid = part.part
